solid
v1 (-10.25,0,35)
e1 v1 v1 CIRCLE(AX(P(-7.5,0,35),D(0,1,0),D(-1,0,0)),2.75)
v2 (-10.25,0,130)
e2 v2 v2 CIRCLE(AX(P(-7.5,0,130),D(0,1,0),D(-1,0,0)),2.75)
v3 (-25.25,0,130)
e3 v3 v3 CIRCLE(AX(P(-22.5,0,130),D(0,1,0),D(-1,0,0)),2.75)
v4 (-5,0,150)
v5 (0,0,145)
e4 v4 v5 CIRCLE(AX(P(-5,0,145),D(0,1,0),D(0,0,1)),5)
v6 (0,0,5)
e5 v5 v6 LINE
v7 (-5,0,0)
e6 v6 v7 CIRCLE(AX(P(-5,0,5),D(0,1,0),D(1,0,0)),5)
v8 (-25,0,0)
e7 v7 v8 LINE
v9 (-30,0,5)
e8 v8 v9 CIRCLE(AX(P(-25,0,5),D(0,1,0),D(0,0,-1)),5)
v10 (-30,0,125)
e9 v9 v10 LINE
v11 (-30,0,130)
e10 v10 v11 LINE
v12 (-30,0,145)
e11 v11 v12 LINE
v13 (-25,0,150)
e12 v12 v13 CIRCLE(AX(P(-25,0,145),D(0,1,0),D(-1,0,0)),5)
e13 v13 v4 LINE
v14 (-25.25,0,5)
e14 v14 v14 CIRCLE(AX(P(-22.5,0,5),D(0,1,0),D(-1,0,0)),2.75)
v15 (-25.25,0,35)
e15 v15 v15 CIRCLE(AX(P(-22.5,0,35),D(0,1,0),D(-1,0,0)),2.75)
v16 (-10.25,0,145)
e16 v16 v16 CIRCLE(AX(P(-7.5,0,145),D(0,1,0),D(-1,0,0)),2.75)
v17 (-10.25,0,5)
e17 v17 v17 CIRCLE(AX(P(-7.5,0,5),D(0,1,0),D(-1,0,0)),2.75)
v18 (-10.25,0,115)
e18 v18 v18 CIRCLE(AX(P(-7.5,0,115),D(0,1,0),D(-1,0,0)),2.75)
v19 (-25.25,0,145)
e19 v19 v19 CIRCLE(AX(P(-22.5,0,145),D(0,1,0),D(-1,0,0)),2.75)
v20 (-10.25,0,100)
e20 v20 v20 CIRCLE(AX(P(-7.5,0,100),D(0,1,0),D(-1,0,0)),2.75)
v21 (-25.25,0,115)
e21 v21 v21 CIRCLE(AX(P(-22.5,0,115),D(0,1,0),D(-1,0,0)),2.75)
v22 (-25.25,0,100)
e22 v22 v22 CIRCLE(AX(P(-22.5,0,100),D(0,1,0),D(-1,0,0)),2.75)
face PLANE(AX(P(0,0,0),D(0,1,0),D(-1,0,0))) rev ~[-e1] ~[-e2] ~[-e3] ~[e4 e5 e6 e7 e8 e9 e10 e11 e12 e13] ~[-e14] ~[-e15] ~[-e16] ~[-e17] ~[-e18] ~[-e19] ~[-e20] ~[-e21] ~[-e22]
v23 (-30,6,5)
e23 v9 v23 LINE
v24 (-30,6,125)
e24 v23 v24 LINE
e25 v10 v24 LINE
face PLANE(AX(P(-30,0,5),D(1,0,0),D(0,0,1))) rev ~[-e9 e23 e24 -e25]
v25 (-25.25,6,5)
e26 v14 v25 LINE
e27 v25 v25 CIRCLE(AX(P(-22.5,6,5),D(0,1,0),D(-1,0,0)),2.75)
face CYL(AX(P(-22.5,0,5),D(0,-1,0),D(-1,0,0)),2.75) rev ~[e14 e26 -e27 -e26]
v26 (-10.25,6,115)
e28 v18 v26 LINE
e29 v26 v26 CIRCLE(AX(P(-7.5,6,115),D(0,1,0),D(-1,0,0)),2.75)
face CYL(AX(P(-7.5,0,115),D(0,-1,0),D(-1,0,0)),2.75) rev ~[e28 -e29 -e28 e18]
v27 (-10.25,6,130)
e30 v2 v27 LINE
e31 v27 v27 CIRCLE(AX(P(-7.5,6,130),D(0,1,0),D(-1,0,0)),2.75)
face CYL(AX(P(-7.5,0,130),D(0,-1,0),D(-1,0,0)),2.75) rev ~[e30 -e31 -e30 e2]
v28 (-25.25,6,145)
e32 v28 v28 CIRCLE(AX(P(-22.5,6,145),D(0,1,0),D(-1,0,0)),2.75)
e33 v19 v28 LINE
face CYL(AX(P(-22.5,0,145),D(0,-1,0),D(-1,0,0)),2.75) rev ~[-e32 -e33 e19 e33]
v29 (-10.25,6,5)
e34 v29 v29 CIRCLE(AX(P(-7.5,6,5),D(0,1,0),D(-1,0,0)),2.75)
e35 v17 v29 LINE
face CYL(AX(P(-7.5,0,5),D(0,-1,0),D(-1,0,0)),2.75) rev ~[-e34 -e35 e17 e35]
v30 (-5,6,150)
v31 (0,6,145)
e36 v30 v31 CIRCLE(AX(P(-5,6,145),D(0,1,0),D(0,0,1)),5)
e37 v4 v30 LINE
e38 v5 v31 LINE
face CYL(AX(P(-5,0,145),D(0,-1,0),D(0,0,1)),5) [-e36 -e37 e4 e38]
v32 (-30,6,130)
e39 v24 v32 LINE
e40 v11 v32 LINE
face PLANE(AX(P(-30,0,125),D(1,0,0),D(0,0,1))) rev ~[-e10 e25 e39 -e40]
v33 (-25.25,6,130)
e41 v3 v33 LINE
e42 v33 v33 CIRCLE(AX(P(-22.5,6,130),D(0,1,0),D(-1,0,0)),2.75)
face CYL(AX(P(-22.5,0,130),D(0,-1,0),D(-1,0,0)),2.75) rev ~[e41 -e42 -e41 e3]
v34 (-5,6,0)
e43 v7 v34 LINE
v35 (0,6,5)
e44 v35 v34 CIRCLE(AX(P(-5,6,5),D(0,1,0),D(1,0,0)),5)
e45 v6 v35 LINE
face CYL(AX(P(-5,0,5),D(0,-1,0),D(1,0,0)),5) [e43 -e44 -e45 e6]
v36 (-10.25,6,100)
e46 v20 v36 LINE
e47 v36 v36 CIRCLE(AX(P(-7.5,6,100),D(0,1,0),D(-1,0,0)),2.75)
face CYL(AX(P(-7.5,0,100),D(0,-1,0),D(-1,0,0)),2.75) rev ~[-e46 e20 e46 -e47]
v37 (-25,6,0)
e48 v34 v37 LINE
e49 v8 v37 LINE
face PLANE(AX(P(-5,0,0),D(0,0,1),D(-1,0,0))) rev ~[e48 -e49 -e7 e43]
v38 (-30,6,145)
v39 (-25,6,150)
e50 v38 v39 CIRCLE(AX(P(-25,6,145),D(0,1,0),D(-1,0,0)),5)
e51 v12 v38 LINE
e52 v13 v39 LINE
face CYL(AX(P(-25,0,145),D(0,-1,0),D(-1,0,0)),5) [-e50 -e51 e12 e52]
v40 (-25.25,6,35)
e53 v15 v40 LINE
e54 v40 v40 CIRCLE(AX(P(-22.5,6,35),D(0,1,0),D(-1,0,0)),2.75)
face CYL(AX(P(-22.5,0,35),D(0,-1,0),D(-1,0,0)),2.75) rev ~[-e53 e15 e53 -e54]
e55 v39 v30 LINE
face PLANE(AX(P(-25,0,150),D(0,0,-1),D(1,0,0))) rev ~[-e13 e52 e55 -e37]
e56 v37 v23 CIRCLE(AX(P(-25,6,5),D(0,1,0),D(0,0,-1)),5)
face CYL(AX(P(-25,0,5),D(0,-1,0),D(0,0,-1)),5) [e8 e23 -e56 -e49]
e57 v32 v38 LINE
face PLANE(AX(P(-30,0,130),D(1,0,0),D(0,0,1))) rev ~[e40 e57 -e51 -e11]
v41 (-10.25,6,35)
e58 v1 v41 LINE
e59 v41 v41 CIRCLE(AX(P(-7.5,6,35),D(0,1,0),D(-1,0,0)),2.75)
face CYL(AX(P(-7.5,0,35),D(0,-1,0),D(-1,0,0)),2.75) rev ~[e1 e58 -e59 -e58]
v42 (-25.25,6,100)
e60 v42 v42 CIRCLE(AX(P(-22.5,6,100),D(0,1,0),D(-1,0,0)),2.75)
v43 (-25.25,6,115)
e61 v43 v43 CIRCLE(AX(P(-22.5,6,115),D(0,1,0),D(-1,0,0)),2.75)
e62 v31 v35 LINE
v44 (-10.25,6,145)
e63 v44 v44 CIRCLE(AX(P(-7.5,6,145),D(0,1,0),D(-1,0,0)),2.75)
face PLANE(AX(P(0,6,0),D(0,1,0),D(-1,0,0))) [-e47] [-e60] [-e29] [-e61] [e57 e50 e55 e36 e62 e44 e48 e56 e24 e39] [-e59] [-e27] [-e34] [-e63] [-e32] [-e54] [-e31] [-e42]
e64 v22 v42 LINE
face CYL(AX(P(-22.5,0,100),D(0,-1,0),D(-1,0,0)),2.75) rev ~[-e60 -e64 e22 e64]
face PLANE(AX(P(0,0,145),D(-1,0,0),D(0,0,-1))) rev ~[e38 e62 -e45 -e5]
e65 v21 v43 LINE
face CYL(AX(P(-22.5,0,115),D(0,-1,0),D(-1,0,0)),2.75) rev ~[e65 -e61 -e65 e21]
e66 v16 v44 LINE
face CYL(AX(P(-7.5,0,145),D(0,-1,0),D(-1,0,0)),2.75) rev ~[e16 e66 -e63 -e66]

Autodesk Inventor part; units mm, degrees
ref_plane "YZ Plane" through (0, 0, 0) normal (1, 0, 0) x (0, 1, 0)
ref_plane "XZ Plane" through (0, 0, 0) normal (0, 1, 0) x (-1, 0, 0)
ref_plane "XY Plane" through (0, 0, 0) normal (0, 0, 1) x (1, 0, 0)
sketch "Sketch7" plane through (0, 0, 0) normal (0, 1, 0) x (-1, 0, 0)
  line L0 (5, 0) -> (25, 0)
  line L1 (30, 5) -> (30, 150)
  line L2 (25, 150) -> (5, 150)
  line L3 (0, 145) -> (0, 5)
  line L4 (30, 145) -> (30, 145)
  line L5 (30, 145) -> (22.5, 145)
  circle A0 centre (22.5, 145) radius 2.75
  circle A1 centre (22.5, 130) radius 2.75
  circle A2 centre (7.5, 145) radius 2.75
  circle A3 centre (7.5, 130) radius 2.75
  line L6 (22.5, 130) -> (30, 130)
  line L7 (30, 130) -> (30, 125)
  circle A4 centre (22.5, 35) radius 2.75
  circle A5 centre (22.5, 5) radius 2.75
  circle A6 centre (7.5, 35) radius 2.75
  circle A7 centre (7.5, 5) radius 2.75
  circle A8 centre (22.5, 115) radius 2.75
  circle A9 centre (7.5, 115) radius 2.75
  circle A10 centre (22.5, 100) radius 2.75
  circle A11 centre (7.5, 100) radius 2.75
  arc A12 (30, 145) -> (25, 150) centre (25, 145) ccw
  arc A13 (5, 150) -> (0, 145) centre (5, 145) ccw
  arc A14 (25, 0) -> (30, 5) centre (25, 5) ccw
  arc A15 (0, 5) -> (5, 0) centre (5, 5) ccw
  point P0 (0, 0)
  point P1 (30, 0)
  point P2 (0, 150)
  dimension "d141" = 30
  dimension "d142" = 150
  dimension "d143" = 5
  dimension "d144" = 7.5
  dimension "d145" = 5.5
  dimension "d148" = 15
  dimension "d151" = 15
  dimension "d154" = 5
  dimension "d159" = 5.5
  dimension "d160" = 30
  dimension "d161" = 15
  dimension "d162" = 5
extrude "Extrusion5" add sketch "Sketch7" along normal blind 6
properties part number "GARFO" material "Aluminium AW-7020"
